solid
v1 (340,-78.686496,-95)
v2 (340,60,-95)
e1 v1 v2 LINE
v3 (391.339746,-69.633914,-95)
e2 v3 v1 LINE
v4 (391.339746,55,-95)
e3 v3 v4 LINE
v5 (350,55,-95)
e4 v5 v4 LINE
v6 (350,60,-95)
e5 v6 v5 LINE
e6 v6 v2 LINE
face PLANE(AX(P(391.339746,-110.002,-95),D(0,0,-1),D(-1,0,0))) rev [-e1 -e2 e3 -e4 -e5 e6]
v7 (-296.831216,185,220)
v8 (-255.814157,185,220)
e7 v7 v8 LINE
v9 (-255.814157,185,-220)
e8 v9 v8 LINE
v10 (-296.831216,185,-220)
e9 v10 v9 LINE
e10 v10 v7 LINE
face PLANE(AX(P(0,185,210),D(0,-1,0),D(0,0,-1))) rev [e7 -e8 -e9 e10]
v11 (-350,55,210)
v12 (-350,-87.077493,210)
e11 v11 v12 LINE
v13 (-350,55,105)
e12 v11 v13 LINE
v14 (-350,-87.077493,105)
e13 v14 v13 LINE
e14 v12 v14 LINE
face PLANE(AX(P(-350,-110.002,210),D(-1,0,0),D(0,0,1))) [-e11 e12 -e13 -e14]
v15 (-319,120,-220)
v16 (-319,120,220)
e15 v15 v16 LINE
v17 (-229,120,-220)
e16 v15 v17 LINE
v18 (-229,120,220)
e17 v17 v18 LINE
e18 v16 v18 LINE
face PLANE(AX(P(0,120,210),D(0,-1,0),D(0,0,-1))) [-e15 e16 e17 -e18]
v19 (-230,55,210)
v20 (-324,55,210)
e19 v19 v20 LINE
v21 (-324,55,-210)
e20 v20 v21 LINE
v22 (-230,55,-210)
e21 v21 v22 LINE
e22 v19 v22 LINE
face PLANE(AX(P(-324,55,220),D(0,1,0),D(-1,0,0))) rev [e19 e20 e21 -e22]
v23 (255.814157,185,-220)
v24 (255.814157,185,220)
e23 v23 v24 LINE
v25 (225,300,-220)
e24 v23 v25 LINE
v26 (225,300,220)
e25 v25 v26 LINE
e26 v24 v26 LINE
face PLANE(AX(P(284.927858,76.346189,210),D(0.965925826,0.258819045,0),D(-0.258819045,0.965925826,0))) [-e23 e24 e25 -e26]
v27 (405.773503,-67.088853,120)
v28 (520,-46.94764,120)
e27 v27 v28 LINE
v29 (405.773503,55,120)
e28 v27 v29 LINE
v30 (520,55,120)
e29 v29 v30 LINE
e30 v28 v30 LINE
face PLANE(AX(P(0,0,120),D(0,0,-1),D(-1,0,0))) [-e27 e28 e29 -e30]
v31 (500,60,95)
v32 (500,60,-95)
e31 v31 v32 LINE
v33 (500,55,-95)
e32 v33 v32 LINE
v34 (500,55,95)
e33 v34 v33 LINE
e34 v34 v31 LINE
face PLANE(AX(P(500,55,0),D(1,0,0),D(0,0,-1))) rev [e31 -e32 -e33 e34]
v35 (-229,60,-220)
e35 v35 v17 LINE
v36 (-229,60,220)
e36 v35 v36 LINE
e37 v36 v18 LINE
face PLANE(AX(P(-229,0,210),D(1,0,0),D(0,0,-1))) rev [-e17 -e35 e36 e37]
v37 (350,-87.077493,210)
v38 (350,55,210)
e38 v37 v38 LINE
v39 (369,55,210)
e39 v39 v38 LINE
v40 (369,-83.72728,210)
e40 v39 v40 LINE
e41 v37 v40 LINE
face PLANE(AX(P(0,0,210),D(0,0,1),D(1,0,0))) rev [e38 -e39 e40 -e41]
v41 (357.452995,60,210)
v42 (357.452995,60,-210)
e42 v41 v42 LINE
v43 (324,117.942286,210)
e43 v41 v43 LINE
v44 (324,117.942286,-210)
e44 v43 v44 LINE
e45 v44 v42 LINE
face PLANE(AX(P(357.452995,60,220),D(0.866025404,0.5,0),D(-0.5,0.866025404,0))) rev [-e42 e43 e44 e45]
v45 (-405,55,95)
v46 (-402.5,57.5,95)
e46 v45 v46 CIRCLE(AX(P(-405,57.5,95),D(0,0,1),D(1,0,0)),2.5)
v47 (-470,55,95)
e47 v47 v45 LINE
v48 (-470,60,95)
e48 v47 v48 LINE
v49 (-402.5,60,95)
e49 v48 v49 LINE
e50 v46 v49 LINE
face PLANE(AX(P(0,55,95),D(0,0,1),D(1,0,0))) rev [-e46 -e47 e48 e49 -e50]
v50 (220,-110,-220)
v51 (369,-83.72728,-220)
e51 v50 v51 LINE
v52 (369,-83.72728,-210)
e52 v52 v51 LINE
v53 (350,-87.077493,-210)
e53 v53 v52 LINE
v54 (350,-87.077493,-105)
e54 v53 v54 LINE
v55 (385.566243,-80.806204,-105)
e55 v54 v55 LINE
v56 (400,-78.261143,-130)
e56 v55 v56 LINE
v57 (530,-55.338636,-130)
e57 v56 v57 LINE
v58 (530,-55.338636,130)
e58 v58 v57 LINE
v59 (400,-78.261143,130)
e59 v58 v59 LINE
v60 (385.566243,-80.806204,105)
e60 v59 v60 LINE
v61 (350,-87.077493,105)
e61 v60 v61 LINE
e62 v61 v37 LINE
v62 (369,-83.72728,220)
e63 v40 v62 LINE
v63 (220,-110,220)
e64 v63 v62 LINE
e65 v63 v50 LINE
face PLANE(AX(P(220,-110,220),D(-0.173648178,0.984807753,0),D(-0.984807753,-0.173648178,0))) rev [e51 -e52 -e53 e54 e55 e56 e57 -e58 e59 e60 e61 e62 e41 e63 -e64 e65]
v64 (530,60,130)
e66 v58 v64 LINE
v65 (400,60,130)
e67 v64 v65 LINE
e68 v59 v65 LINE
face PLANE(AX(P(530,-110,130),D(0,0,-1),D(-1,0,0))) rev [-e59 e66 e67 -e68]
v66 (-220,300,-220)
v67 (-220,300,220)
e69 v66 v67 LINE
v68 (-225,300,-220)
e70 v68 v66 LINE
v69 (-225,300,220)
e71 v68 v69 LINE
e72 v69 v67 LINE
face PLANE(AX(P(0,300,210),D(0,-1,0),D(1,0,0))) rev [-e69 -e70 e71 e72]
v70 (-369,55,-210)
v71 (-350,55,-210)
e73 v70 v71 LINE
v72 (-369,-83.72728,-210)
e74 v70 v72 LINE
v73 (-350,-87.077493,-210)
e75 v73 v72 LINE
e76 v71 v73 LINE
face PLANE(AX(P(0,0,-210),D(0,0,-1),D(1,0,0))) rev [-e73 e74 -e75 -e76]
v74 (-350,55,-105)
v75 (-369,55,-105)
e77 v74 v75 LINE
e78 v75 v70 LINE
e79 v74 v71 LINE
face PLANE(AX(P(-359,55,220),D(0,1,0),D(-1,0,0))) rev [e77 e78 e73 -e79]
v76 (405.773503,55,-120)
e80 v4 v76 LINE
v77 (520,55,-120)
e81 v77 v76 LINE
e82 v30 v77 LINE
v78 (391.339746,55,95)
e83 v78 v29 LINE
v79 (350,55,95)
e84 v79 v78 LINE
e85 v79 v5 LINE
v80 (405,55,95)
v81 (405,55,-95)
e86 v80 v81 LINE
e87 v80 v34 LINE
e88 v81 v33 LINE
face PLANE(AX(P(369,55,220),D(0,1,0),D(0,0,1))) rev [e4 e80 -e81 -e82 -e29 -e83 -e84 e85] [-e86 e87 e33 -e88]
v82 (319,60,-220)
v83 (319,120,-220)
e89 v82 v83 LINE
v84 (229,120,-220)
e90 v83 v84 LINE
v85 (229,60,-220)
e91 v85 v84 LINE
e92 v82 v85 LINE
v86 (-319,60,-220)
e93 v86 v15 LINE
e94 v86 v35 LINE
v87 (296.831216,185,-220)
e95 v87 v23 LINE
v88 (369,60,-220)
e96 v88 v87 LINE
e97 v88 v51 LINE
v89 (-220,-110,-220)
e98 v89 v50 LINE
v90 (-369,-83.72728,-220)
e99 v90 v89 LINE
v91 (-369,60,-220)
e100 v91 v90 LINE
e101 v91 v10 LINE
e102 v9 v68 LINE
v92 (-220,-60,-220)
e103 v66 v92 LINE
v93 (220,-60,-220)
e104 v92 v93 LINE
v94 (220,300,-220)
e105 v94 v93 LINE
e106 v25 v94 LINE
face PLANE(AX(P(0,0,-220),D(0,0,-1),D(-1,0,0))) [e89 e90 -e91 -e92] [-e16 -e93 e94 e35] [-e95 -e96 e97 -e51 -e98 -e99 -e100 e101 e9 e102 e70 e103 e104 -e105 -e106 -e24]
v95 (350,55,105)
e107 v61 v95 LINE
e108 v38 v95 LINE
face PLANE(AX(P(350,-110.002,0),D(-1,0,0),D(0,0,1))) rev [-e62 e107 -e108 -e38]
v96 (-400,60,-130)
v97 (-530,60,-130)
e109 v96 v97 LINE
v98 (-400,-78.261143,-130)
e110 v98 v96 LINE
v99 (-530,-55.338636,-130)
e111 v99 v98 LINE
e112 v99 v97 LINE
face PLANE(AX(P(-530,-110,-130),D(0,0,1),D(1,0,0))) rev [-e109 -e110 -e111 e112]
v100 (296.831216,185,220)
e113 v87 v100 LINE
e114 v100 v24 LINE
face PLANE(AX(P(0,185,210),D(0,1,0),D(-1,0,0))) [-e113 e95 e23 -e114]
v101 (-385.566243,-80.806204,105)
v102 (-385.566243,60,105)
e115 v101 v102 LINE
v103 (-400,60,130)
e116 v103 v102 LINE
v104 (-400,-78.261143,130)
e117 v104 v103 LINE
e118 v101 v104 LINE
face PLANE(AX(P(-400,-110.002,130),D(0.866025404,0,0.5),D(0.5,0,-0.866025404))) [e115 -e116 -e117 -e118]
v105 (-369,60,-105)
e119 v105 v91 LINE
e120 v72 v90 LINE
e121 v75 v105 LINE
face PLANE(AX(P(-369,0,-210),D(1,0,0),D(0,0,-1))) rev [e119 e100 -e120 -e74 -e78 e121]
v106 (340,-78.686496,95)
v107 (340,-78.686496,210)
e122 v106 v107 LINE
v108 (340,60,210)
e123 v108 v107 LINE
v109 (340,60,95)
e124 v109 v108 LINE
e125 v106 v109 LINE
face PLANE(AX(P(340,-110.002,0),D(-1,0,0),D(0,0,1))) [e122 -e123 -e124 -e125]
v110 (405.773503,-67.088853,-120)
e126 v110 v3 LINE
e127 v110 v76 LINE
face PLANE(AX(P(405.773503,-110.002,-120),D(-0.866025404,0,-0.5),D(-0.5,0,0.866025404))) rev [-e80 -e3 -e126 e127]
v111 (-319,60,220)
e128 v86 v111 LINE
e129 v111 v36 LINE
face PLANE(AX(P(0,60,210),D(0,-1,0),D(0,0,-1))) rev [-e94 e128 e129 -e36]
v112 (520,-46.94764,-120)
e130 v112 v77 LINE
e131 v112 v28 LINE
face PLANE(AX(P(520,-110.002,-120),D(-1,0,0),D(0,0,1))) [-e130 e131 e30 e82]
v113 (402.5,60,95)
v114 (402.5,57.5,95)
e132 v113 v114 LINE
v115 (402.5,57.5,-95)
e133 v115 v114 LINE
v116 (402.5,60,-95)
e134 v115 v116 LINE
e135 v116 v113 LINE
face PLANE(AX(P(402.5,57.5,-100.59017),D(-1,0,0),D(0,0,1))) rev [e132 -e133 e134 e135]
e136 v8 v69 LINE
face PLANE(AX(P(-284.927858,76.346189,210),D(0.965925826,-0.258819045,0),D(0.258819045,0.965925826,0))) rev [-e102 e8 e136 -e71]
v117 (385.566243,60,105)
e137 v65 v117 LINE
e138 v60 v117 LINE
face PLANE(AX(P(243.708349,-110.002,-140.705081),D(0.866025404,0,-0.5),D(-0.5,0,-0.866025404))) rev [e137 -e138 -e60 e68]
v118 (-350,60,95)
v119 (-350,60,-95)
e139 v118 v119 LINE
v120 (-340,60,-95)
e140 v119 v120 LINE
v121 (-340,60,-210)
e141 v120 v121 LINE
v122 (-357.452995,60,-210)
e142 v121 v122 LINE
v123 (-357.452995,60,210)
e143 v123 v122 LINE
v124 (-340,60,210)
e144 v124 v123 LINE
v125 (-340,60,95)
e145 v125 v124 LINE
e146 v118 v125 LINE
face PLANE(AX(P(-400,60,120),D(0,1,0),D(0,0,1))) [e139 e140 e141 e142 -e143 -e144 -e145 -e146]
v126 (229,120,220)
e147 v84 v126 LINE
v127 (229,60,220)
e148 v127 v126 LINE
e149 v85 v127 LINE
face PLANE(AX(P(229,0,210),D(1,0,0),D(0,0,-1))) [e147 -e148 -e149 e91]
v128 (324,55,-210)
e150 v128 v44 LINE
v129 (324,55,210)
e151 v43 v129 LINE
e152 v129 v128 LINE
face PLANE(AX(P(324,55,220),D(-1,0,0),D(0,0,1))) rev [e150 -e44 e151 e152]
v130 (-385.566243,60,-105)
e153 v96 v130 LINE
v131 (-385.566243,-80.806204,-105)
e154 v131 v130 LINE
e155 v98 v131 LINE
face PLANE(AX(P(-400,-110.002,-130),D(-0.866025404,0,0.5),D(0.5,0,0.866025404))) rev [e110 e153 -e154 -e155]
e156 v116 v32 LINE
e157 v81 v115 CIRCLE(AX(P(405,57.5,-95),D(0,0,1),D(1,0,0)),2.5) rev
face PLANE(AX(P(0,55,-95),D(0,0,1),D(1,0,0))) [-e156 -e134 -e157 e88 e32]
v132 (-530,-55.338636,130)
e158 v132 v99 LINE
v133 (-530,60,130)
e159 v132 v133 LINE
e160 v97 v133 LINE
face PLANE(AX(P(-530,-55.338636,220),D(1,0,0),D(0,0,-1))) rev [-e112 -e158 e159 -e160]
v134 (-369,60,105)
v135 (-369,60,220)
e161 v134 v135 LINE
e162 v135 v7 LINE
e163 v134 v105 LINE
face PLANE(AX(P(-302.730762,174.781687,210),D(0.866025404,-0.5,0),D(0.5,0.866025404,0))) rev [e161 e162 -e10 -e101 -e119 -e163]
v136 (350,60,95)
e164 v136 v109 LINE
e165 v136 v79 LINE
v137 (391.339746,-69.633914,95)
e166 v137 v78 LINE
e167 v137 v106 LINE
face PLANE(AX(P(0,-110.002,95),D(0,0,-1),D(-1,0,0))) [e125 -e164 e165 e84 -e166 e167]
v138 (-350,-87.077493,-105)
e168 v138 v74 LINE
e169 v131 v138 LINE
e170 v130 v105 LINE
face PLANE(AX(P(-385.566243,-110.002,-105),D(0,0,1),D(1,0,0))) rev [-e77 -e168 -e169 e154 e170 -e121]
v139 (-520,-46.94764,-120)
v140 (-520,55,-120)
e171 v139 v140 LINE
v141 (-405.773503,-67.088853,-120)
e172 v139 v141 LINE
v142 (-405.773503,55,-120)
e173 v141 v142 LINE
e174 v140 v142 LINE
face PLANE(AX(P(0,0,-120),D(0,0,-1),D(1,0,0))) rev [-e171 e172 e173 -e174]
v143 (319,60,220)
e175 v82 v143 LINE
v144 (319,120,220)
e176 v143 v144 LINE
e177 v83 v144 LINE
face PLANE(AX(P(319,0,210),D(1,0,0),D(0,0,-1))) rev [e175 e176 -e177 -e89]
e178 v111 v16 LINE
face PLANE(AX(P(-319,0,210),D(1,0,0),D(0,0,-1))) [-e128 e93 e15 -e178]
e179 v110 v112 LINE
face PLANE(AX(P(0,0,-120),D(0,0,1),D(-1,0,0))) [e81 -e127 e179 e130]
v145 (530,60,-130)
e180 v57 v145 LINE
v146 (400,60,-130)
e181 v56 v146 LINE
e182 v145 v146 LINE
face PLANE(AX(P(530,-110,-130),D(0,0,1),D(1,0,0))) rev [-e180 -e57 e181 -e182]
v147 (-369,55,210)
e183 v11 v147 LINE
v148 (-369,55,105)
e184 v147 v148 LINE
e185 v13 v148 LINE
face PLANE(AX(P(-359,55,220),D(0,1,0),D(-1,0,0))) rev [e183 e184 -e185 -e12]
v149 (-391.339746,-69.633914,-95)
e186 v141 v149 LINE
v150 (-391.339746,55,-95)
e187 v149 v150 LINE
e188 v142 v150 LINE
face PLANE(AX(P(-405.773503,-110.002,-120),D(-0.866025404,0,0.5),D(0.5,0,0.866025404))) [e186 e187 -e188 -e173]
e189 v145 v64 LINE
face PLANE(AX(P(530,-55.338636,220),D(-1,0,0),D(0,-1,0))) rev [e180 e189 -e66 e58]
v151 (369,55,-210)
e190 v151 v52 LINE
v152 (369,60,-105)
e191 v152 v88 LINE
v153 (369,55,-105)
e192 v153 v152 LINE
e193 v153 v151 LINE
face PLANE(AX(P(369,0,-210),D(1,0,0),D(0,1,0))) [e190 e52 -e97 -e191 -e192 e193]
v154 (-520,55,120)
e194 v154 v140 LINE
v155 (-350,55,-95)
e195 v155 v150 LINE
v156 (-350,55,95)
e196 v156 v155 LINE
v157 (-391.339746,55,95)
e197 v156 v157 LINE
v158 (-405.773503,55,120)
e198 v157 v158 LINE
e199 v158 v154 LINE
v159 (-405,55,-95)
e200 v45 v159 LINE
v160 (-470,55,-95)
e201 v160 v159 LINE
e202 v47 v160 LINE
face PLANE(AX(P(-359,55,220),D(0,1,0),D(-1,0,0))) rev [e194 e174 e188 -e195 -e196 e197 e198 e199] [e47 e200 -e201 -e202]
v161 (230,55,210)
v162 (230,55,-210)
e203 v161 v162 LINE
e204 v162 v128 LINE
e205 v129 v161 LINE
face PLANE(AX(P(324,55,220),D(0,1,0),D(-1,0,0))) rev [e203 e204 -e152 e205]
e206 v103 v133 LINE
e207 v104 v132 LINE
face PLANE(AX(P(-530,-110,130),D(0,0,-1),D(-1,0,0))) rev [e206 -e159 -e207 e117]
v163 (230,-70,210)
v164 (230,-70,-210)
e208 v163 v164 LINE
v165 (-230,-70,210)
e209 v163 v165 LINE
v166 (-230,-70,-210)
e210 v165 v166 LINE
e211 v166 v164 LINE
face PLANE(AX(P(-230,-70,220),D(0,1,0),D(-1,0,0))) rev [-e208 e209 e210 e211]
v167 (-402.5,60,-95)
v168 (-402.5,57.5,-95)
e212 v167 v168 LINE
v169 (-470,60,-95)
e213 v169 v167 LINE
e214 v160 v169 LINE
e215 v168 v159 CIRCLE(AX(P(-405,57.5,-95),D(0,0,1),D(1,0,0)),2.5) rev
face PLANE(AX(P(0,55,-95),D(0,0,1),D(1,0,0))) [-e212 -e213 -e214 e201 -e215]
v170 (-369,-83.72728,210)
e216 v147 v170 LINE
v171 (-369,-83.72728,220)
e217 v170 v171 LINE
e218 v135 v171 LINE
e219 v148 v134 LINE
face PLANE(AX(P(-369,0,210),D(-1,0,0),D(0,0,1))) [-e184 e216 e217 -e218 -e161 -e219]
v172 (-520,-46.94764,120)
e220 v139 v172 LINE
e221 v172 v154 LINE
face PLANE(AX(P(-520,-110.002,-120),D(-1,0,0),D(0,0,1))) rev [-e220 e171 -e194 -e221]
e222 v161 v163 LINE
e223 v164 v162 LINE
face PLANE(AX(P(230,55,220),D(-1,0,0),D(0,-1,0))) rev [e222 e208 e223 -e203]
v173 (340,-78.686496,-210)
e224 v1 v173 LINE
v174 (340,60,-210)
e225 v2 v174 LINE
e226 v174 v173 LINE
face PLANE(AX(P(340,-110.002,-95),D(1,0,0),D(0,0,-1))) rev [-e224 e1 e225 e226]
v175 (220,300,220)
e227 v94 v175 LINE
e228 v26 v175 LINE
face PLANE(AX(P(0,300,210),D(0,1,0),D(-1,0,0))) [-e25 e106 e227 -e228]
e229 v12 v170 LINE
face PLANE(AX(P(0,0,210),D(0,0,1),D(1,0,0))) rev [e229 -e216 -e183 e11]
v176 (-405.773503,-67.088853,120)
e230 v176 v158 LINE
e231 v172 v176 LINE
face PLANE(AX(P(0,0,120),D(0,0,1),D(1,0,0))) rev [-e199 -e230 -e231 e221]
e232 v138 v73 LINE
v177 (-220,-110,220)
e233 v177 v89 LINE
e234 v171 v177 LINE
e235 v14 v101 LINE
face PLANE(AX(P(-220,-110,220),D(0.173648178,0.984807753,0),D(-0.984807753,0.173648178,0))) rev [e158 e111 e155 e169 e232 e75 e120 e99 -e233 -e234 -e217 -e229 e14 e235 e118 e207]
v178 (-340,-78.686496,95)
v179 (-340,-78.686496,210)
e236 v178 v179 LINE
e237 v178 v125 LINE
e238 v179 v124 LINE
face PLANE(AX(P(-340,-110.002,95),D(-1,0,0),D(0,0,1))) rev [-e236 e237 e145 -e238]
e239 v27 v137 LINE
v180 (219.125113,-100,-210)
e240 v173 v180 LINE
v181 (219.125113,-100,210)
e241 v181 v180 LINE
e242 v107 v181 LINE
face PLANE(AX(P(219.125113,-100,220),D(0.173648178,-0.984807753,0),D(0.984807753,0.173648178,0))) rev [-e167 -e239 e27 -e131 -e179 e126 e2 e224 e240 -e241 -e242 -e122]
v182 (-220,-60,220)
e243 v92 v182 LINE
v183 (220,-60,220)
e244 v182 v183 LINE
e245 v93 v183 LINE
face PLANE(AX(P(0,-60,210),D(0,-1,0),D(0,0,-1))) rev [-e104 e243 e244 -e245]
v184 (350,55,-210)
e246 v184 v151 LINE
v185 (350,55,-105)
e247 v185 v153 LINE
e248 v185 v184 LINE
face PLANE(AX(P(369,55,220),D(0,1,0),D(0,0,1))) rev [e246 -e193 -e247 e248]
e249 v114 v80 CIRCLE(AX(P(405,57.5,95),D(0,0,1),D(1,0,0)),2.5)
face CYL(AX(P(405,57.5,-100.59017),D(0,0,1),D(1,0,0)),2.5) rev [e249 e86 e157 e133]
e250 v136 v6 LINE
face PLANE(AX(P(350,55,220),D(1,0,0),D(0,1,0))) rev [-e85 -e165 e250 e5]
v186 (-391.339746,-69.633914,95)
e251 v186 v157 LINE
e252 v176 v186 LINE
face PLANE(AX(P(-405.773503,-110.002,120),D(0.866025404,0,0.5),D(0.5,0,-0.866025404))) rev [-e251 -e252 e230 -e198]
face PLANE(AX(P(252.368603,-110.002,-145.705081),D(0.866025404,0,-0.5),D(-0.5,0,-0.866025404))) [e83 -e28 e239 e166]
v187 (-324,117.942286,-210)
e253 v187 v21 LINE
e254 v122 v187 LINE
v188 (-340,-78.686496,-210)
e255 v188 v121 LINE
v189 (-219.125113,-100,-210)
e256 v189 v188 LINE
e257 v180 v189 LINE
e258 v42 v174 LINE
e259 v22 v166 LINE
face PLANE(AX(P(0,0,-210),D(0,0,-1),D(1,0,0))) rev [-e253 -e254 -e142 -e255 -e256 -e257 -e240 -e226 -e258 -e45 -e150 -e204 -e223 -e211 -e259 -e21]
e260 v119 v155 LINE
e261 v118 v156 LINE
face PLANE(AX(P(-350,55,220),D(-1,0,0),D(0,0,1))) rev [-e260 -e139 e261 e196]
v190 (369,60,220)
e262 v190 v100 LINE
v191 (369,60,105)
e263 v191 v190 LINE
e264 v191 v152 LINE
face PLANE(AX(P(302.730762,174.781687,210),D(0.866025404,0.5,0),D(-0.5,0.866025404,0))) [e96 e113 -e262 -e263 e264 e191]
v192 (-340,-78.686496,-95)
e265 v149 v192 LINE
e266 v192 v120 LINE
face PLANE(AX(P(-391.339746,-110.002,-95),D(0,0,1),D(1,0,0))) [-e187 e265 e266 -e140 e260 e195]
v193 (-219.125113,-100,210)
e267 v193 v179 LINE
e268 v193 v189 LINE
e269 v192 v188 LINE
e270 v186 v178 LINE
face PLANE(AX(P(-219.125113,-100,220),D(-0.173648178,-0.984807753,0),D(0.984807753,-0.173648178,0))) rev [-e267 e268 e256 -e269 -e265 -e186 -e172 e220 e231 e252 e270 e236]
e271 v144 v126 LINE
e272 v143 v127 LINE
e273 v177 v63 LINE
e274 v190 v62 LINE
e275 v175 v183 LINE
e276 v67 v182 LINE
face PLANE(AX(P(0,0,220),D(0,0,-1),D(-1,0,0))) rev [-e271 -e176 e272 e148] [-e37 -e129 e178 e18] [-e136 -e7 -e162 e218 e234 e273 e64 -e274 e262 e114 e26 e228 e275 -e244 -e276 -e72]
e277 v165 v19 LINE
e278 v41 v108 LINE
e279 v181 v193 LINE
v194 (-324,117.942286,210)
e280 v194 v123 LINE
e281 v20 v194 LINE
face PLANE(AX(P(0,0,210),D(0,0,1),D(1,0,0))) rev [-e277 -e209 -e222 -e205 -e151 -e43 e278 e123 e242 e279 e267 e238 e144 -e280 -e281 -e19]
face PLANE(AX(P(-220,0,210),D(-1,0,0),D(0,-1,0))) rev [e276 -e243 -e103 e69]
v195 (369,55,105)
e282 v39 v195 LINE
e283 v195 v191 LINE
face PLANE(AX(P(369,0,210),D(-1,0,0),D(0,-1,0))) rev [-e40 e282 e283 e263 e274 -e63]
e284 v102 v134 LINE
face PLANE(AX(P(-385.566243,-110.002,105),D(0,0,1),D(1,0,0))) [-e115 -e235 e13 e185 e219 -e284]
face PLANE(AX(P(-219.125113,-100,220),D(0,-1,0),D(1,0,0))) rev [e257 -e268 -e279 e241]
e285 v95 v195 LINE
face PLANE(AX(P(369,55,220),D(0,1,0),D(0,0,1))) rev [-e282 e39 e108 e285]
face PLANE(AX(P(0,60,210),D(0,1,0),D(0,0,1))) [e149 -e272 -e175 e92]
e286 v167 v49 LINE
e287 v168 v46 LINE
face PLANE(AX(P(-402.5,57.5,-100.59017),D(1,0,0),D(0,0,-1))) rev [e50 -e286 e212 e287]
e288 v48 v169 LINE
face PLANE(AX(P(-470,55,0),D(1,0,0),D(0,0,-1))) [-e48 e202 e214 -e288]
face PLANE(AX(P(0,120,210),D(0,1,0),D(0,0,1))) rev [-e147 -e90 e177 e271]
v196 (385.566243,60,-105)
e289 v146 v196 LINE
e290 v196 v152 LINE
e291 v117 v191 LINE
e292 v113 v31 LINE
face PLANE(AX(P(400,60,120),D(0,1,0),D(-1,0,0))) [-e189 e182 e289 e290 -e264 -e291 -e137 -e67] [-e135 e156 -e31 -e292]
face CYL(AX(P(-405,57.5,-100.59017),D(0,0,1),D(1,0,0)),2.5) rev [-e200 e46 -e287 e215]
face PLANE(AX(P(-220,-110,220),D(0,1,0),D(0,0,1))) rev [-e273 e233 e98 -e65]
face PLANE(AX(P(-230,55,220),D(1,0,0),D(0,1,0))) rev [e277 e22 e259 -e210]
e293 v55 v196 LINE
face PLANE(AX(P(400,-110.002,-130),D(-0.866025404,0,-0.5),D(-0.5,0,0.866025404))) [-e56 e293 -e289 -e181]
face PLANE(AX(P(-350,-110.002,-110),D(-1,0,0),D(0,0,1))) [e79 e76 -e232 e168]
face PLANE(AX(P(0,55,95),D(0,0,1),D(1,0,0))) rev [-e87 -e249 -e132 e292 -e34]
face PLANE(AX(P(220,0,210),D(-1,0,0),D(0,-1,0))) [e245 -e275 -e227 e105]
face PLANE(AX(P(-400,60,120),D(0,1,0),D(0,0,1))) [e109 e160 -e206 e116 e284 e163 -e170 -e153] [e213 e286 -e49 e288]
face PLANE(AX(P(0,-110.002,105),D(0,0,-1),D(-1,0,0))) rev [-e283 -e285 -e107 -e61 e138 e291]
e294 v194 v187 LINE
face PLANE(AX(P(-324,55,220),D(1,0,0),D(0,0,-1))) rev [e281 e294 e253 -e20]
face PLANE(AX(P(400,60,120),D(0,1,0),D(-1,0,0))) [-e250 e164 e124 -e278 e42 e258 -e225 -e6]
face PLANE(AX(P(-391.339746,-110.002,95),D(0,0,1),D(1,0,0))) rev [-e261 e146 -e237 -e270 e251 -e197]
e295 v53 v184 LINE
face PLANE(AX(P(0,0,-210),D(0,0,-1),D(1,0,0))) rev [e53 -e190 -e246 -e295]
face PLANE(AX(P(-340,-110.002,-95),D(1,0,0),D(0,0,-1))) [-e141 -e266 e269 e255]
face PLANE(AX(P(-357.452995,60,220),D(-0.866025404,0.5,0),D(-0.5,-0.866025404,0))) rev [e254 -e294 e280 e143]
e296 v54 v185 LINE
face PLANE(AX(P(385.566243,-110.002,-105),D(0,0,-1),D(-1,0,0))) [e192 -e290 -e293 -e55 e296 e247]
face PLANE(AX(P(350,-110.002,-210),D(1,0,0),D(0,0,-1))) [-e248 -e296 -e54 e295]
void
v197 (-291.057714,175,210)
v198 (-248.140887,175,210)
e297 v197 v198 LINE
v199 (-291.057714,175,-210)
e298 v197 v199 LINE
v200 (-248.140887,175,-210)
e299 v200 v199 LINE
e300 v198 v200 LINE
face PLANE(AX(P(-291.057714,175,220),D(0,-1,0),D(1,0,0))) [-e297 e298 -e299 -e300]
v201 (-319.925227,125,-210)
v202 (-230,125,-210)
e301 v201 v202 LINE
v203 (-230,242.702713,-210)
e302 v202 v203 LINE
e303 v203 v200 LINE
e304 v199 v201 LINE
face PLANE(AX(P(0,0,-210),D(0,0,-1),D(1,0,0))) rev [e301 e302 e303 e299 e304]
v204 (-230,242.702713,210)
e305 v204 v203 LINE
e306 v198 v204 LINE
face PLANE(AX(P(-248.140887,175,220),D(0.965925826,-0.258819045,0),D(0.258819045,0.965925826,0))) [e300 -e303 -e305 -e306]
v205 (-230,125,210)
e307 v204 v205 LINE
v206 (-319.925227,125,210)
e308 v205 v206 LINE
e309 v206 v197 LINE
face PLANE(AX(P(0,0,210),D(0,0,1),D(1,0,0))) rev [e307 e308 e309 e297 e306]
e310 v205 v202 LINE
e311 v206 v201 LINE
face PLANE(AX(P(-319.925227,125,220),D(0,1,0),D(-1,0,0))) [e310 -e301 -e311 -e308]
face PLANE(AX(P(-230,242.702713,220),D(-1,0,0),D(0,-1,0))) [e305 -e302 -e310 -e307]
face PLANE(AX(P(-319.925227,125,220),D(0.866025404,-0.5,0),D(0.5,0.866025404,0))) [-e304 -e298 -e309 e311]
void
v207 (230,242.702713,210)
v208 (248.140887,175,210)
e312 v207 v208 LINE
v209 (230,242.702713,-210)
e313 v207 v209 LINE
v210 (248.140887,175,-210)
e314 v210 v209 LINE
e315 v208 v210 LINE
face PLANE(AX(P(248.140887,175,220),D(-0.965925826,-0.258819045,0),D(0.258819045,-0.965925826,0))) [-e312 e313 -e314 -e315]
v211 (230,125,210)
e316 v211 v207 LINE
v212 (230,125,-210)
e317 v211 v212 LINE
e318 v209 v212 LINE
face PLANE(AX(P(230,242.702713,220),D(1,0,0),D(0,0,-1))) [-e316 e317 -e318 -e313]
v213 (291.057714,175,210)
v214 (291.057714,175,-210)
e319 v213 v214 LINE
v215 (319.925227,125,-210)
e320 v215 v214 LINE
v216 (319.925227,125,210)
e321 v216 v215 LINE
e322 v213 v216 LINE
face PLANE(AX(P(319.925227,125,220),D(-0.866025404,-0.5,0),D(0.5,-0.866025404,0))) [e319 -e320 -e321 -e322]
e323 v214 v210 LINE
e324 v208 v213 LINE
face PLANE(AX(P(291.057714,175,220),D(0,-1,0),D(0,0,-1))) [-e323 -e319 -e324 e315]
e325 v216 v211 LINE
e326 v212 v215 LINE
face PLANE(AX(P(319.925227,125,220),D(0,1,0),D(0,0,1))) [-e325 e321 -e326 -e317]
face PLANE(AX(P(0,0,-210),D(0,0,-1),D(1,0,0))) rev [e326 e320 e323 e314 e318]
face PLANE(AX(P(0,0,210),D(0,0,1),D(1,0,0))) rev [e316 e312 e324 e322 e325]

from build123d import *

# Parameters (mm, degrees)
EXTRUDE_1_DEPTH                 = 220
SKETCH_3_W                      = 130
SKETCH_3_H                      = 90
CUT_EXTRUDE_1_DEPTH             = 585.29444632
EXTRUDE_5_DEPTH                 = 10
EXTRUDE_START                   = -130
EXTRUDE_6_DEPTH                 = 260
EXTRUDE_START_2                 = -220
EXTRUDE_6_2_DEPTH               = 125
EXTRUDE_START_3                 = 95
EXTRUDE_6_3_DEPTH               = 125
EXTRUDE_START_4                 = -76.923226389
EXTRUDE_6_4_DEPTH               = 136.923226389
CUT_EXTRUDE_2_DEPTH             = 585.29444632
SKETCH_13_W                     = 90
SKETCH_13_H                     = 60
EXTRUDE_7_DEPTH                 = 10
EXTRUDE_10_REACH                = 649.534
SKETCH_16_W                     = 90
SKETCH_16_H                     = 60
EXTRUDE_10_DIRECTION_2_REACH    = 649.534
SKETCH_17_W                     = 65
SKETCH_17_H                     = 190
SKETCH_17_W_2                   = 95
EXTRUDE_15_DEPTH                = 5
CUT_EXTRUDE_3_REACH             = 649.534
CUT_EXTRUDE_3_DIRECTION_2_REACH = 649.534


with BuildPart() as part:
    # Эскиз1 → Бобышка-Вытянуть1 (new, symmetric)
    with BuildSketch(Plane.XY):
        Polygon((-219.125113365, -100), (219.125113365, -100), (530, -45.184369862), (530, -55.33863598), (220, -110), (-220, -110), (-530, -55.33863598), (-530, -45.184369862), align=None)
    extrude(amount=EXTRUDE_1_DEPTH, both=True)

    # Эскиз3 → Вырез-Вытянуть1 (cut, through all)
    with BuildSketch(Plane(origin=(0, 0, 0), x_dir=(1, 0, 0), z_dir=(0, 1, 0))):
        with Locations((-465, 175)):
            Rectangle(SKETCH_3_W, SKETCH_3_H)
        with Locations((465, 175)):
            Rectangle(SKETCH_3_W, SKETCH_3_H)
        with Locations((465, -175)):
            Rectangle(SKETCH_3_W, SKETCH_3_H)
        with Locations((-465, -175)):
            Rectangle(SKETCH_3_W, SKETCH_3_H)
    extrude(amount=-CUT_EXTRUDE_1_DEPTH, mode=Mode.SUBTRACT)

    # Эскиз9 → Бобышка-Вытянуть5 (add)
    with BuildSketch(Plane.XY.offset(130)):
        Polygon((-530, -45.184369862), (-400, -68.106877354), (-400, 60), (-530, 60), align=None)
        Polygon((400, -68.106877354), (400, 60), (530, 60), (530, -45.184369862), align=None)
    extrude_5 = extrude(amount=-EXTRUDE_5_DEPTH)

    # Зеркальное отражение3: Бобышка-Вытянуть5 across plane
    add(extrude_5.mirror(Plane.XY))

    # Бобышка-Вытянуть6: read off the stored shape, not the designer's step
    # Бобышка-Вытянуть6 outline → Бобышка-Вытянуть6 (add)
    with BuildSketch(Plane.XY.offset(EXTRUDE_START)):
        Polygon((-530, 60), (-530, -45.184369862), (-520, -46.947639669), (-520, 60), align=None)
        Polygon((530, -45.184369862), (530, 60), (520, 60), (520, -46.947639669), align=None)
    extrude(amount=EXTRUDE_6_DEPTH)

    # Extrude 6 2 outline → Extrude 6 2 (add)
    with BuildSketch(Plane.XY.offset(EXTRUDE_START_2)):
        Polygon((-350, 60), (-350, -76.923226389), (-340, -78.686496196), (-340, 60), align=None)
        Polygon((350, -76.923226389), (350, 60), (340, 60), (340, -78.686496196), align=None)
    extrude(amount=EXTRUDE_6_2_DEPTH)

    # Extrude 6 3 outline → Extrude 6 3 (add)
    with BuildSketch(Plane.XY.offset(EXTRUDE_START_3)):
        Polygon((-350, 60), (-350, -76.923226389), (-340, -78.686496196), (-340, 60), align=None)
        Polygon((350, -76.923226389), (350, 60), (340, 60), (340, -78.686496196), align=None)
    extrude(amount=EXTRUDE_6_3_DEPTH)

    # Extrude 6 4 outline → Extrude 6 4 (add)
    with BuildSketch(Plane(origin=(0, 0, 0), x_dir=(1, 0, 0), z_dir=(0, 1, 0)).offset(EXTRUDE_START_4)):
        Polygon((350, -105), (385.56624327, -105), (400, -130), (400, -120), (405.773502692, -120), (391.339745962, -95), (350, -95), align=None)
        Polygon((-400, -130), (-385.56624327, -105), (-350, -105), (-350, -95), (-391.339745962, -95), (-405.773502692, -120), (-400, -120), align=None)
        Polygon((-400, 120), (-405.773502692, 120), (-391.339745962, 95), (-350, 95), (-350, 105), (-385.56624327, 105), (-400, 130), align=None)
        Polygon((400, 130), (385.56624327, 105), (350, 105), (350, 95), (391.339745962, 95), (405.773502692, 120), (400, 120), align=None)
    extrude(amount=EXTRUDE_6_4_DEPTH)

    # Эскиз12 → Вырез-Вытянуть2 (cut, through all)
    with BuildSketch(Plane(origin=(0, 0, 0), x_dir=(1, 0, 0), z_dir=(0, 1, 0))):
        Polygon((350, -105), (350, -220), (400, -220), (400, -130), (385.56624327, -105), align=None)
        Polygon((400, 220), (350, 220), (350, 105), (385.56624327, 105), (400, 130), align=None)
        Polygon((-400, -220), (-350, -220), (-350, -105), (-385.56624327, -105), (-400, -130), align=None)
        Polygon((-400, 130), (-385.56624327, 105), (-350, 105), (-350, 220), (-400, 220), align=None)
    extrude(amount=-CUT_EXTRUDE_2_DEPTH, mode=Mode.SUBTRACT)

    # Эскиз13 → Бобышка-Вытянуть7 (add)
    # profile 1 of 2: a face of its own
    with BuildSketch(Plane.XY.offset(220)):
        Polygon((-296.831216351, 185), (-369, 60), (-369, -83.727279874), (-350, -87.077492508), (-350, 60), (-340, 60), (-340, -78.686496196), (-219.125113365, -100), (219.125113365, -100), (340, -78.686496196), (340, 60), (350, 60), (350, -87.077492508), (369, -83.727279874), (369, 60), (296.831216351, 185), (255.81415713, 185), (225, 300), (220, 300), (220, -60), (-220, -60), (-220, 300), (-225, 300), (-255.81415713, 185), align=None)
        with Locations((-274, 90)):
            Rectangle(SKETCH_13_W, SKETCH_13_H, mode=Mode.SUBTRACT)
        with Locations((274, 90)):
            Rectangle(SKETCH_13_W, SKETCH_13_H, mode=Mode.SUBTRACT)
    # profile 2 of 2: a face of its own
    with BuildSketch(Plane.XY.offset(220)):
        Polygon((-350, 60), (-350, -87.077492508), (-220, -110), (220, -110), (350, -87.077492508), (350, 60), (340, 60), (340, -78.686496196), (219.125113365, -100), (-219.125113365, -100), (-340, -78.686496196), (-340, 60), align=None)
    extrude_7 = extrude(amount=-EXTRUDE_7_DEPTH)

    # Зеркальное отражение4: Бобышка-Вытянуть7 across plane
    add(extrude_7.mirror(Plane.XY))

    # Эскиз16 → Бобышка-Вытянуть10 (add, up to next)
    with BuildSketch(Plane.XY, mode=Mode.PRIVATE) as extrude_10_sk1:
        Polygon((369, 60), (296.831216351, 185), (255.81415713, 185), (225, 300), (220, 300), (220, -60), (-220, -60), (-220, 300), (-225, 300), (-255.81415713, 185), (-296.831216351, 185), (-369, 60), (-369, 55), (-359, 55), (-350, 55), (-350, 60), (-357.452994616, 60), (-324, 117.942286341), (-324, 55), (-230, 55), (-230, -70), (230, -70), (230, 55), (324, 55), (324, 117.942286341), (357.452994616, 60), (350, 60), (350, 55), (359, 55), (369, 55), align=None)
        Polygon((-291.057713659, 175), (-248.14088725, 175), (-230, 242.702712911), (-230, 125), (-319.925227119, 125), align=None, mode=Mode.SUBTRACT)
        Polygon((230, 242.702712911), (230, 125), (319.925227119, 125), (291.057713659, 175), (248.14088725, 175), align=None, mode=Mode.SUBTRACT)
        with Locations((-274, 90)):
            Rectangle(SKETCH_16_W, SKETCH_16_H, mode=Mode.SUBTRACT)
        with Locations((274, 90)):
            Rectangle(SKETCH_16_W, SKETCH_16_H, mode=Mode.SUBTRACT)
    extrude_10_tool1 = extrude(extrude_10_sk1.sketch, amount=EXTRUDE_10_REACH, mode=Mode.PRIVATE) - part.part
    add(extrude_10_tool1.solids().sort_by_distance((325.766077, 118.372216, 0))[0])

    # Эскиз16 → Бобышка-Вытянуть10 direction 2 (add, up to next)
    with BuildSketch(Plane.XY, mode=Mode.PRIVATE) as extrude_10_direction_2_sk1:
        Polygon((369, 60), (296.831216351, 185), (255.81415713, 185), (225, 300), (220, 300), (220, -60), (-220, -60), (-220, 300), (-225, 300), (-255.81415713, 185), (-296.831216351, 185), (-369, 60), (-369, 55), (-359, 55), (-350, 55), (-350, 60), (-357.452994616, 60), (-324, 117.942286341), (-324, 55), (-230, 55), (-230, -70), (230, -70), (230, 55), (324, 55), (324, 117.942286341), (357.452994616, 60), (350, 60), (350, 55), (359, 55), (369, 55), align=None)
        Polygon((-291.057713659, 175), (-248.14088725, 175), (-230, 242.702712911), (-230, 125), (-319.925227119, 125), align=None, mode=Mode.SUBTRACT)
        Polygon((230, 242.702712911), (230, 125), (319.925227119, 125), (291.057713659, 175), (248.14088725, 175), align=None, mode=Mode.SUBTRACT)
        with Locations((-274, 90)):
            Rectangle(SKETCH_16_W, SKETCH_16_H, mode=Mode.SUBTRACT)
        with Locations((274, 90)):
            Rectangle(SKETCH_16_W, SKETCH_16_H, mode=Mode.SUBTRACT)
    extrude_10_direction_2_tool1 = extrude(extrude_10_direction_2_sk1.sketch, amount=-EXTRUDE_10_DIRECTION_2_REACH, mode=Mode.PRIVATE) - part.part
    add(extrude_10_direction_2_tool1.solids().sort_by_distance((325.766077, 118.372216, 0))[0])

    # Эскиз17 → Бобышка-Вытянуть15 (add)
    # profile 1 of 2: a face of its own
    with BuildSketch(Plane(origin=(0, 60, 0), x_dir=(1, 0, 0), z_dir=(0, 1, 0))):
        Polygon((-391.339745962, -95), (-369, -95), (-369, 95), (-391.339745962, 95), (-405.773502692, 120), (-520, 120), (-520, -120), (-405.773502692, -120), align=None)
        with Locations((-437.5, 0)):
            Rectangle(SKETCH_17_W, SKETCH_17_H, mode=Mode.SUBTRACT)
    # profile 2 of 2: a face of its own
    with BuildSketch(Plane(origin=(0, 60, 0), x_dir=(1, 0, 0), z_dir=(0, 1, 0))):
        Polygon((385.56624327, 105), (369, 105), (369, -105), (385.56624327, -105), (400, -130), (530, -130), (530, 130), (400, 130), align=None)
        with Locations((452.5, 0)):
            Rectangle(SKETCH_17_W_2, SKETCH_17_H, mode=Mode.SUBTRACT)
    extrude(amount=-EXTRUDE_15_DEPTH)

    # Вырез-Вытянуть3: up to this face of the body (flat: up to its plane)
    cut_extrude_3_end = Plane(part.part.faces().sort_by_distance((-437.5, 57.5, -95))[0])
    # Эскиз18 → Вырез-Вытянуть3 (cut, up to the picked face)
    with BuildSketch(Plane.XY, mode=Mode.PRIVATE) as cut_extrude_3_sk1:
        with BuildLine():
            Line((-405, 55), (-405, 60))
            Line((-405, 60), (-402.5, 60))
            Line((-402.5, 60), (-402.5, 57.5))
            ThreePointArc((-402.5, 57.5), (-403.232233047, 55.732233047), (-405, 55))
        make_face()
    cut_extrude_3_tool1 = split(extrude(cut_extrude_3_sk1.sketch, amount=-CUT_EXTRUDE_3_REACH, mode=Mode.PRIVATE), bisect_by=cut_extrude_3_end, keep=Keep.BOTH, mode=Mode.PRIVATE)
    # Эскиз18 → Вырез-Вытянуть3 (cut, up to the picked face)
    with BuildSketch(Plane.XY, mode=Mode.PRIVATE) as cut_extrude_3_sk2:
        with BuildLine():
            Line((405, 55), (405, 60))
            Line((405, 60), (402.5, 60))
            Line((402.5, 60), (402.5, 57.5))
            ThreePointArc((402.5, 57.5), (403.232233047, 55.732233047), (405, 55))
        make_face()
    cut_extrude_3_tool2 = split(extrude(cut_extrude_3_sk2.sketch, amount=-CUT_EXTRUDE_3_REACH, mode=Mode.PRIVATE), bisect_by=cut_extrude_3_end, keep=Keep.BOTH, mode=Mode.PRIVATE)
    add(cut_extrude_3_tool1.solids().sort_by(Axis((-403.833127, 57.733375, 0), (0, 0, -1)))[0], mode=Mode.SUBTRACT)
    add(cut_extrude_3_tool2.solids().sort_by(Axis((403.833127, 57.733375, 0), (0, 0, -1)))[0], mode=Mode.SUBTRACT)

    # Вырез-Вытянуть3 direction 2: up to this face of the body (flat: up to its plane)
    cut_extrude_3_direction_2_end = Plane(part.part.faces().sort_by_distance((-437.5, 57.5, 95))[0])
    # Эскиз18 → Вырез-Вытянуть3 direction 2 (cut, up to the picked face)
    with BuildSketch(Plane.XY, mode=Mode.PRIVATE) as cut_extrude_3_direction_2_sk1:
        with BuildLine():
            Line((-405, 55), (-405, 60))
            Line((-405, 60), (-402.5, 60))
            Line((-402.5, 60), (-402.5, 57.5))
            ThreePointArc((-402.5, 57.5), (-403.232233047, 55.732233047), (-405, 55))
        make_face()
    cut_extrude_3_direction_2_tool1 = split(extrude(cut_extrude_3_direction_2_sk1.sketch, amount=CUT_EXTRUDE_3_DIRECTION_2_REACH, mode=Mode.PRIVATE), bisect_by=cut_extrude_3_direction_2_end, keep=Keep.BOTH, mode=Mode.PRIVATE)
    # Эскиз18 → Вырез-Вытянуть3 direction 2 (cut, up to the picked face)
    with BuildSketch(Plane.XY, mode=Mode.PRIVATE) as cut_extrude_3_direction_2_sk2:
        with BuildLine():
            Line((405, 55), (405, 60))
            Line((405, 60), (402.5, 60))
            Line((402.5, 60), (402.5, 57.5))
            ThreePointArc((402.5, 57.5), (403.232233047, 55.732233047), (405, 55))
        make_face()
    cut_extrude_3_direction_2_tool2 = split(extrude(cut_extrude_3_direction_2_sk2.sketch, amount=CUT_EXTRUDE_3_DIRECTION_2_REACH, mode=Mode.PRIVATE), bisect_by=cut_extrude_3_direction_2_end, keep=Keep.BOTH, mode=Mode.PRIVATE)
    add(cut_extrude_3_direction_2_tool1.solids().sort_by(Axis((-403.833127, 57.733375, 0), (0, 0, 1)))[0], mode=Mode.SUBTRACT)
    add(cut_extrude_3_direction_2_tool2.solids().sort_by(Axis((403.833127, 57.733375, 0), (0, 0, 1)))[0], mode=Mode.SUBTRACT)


solid = part.part
